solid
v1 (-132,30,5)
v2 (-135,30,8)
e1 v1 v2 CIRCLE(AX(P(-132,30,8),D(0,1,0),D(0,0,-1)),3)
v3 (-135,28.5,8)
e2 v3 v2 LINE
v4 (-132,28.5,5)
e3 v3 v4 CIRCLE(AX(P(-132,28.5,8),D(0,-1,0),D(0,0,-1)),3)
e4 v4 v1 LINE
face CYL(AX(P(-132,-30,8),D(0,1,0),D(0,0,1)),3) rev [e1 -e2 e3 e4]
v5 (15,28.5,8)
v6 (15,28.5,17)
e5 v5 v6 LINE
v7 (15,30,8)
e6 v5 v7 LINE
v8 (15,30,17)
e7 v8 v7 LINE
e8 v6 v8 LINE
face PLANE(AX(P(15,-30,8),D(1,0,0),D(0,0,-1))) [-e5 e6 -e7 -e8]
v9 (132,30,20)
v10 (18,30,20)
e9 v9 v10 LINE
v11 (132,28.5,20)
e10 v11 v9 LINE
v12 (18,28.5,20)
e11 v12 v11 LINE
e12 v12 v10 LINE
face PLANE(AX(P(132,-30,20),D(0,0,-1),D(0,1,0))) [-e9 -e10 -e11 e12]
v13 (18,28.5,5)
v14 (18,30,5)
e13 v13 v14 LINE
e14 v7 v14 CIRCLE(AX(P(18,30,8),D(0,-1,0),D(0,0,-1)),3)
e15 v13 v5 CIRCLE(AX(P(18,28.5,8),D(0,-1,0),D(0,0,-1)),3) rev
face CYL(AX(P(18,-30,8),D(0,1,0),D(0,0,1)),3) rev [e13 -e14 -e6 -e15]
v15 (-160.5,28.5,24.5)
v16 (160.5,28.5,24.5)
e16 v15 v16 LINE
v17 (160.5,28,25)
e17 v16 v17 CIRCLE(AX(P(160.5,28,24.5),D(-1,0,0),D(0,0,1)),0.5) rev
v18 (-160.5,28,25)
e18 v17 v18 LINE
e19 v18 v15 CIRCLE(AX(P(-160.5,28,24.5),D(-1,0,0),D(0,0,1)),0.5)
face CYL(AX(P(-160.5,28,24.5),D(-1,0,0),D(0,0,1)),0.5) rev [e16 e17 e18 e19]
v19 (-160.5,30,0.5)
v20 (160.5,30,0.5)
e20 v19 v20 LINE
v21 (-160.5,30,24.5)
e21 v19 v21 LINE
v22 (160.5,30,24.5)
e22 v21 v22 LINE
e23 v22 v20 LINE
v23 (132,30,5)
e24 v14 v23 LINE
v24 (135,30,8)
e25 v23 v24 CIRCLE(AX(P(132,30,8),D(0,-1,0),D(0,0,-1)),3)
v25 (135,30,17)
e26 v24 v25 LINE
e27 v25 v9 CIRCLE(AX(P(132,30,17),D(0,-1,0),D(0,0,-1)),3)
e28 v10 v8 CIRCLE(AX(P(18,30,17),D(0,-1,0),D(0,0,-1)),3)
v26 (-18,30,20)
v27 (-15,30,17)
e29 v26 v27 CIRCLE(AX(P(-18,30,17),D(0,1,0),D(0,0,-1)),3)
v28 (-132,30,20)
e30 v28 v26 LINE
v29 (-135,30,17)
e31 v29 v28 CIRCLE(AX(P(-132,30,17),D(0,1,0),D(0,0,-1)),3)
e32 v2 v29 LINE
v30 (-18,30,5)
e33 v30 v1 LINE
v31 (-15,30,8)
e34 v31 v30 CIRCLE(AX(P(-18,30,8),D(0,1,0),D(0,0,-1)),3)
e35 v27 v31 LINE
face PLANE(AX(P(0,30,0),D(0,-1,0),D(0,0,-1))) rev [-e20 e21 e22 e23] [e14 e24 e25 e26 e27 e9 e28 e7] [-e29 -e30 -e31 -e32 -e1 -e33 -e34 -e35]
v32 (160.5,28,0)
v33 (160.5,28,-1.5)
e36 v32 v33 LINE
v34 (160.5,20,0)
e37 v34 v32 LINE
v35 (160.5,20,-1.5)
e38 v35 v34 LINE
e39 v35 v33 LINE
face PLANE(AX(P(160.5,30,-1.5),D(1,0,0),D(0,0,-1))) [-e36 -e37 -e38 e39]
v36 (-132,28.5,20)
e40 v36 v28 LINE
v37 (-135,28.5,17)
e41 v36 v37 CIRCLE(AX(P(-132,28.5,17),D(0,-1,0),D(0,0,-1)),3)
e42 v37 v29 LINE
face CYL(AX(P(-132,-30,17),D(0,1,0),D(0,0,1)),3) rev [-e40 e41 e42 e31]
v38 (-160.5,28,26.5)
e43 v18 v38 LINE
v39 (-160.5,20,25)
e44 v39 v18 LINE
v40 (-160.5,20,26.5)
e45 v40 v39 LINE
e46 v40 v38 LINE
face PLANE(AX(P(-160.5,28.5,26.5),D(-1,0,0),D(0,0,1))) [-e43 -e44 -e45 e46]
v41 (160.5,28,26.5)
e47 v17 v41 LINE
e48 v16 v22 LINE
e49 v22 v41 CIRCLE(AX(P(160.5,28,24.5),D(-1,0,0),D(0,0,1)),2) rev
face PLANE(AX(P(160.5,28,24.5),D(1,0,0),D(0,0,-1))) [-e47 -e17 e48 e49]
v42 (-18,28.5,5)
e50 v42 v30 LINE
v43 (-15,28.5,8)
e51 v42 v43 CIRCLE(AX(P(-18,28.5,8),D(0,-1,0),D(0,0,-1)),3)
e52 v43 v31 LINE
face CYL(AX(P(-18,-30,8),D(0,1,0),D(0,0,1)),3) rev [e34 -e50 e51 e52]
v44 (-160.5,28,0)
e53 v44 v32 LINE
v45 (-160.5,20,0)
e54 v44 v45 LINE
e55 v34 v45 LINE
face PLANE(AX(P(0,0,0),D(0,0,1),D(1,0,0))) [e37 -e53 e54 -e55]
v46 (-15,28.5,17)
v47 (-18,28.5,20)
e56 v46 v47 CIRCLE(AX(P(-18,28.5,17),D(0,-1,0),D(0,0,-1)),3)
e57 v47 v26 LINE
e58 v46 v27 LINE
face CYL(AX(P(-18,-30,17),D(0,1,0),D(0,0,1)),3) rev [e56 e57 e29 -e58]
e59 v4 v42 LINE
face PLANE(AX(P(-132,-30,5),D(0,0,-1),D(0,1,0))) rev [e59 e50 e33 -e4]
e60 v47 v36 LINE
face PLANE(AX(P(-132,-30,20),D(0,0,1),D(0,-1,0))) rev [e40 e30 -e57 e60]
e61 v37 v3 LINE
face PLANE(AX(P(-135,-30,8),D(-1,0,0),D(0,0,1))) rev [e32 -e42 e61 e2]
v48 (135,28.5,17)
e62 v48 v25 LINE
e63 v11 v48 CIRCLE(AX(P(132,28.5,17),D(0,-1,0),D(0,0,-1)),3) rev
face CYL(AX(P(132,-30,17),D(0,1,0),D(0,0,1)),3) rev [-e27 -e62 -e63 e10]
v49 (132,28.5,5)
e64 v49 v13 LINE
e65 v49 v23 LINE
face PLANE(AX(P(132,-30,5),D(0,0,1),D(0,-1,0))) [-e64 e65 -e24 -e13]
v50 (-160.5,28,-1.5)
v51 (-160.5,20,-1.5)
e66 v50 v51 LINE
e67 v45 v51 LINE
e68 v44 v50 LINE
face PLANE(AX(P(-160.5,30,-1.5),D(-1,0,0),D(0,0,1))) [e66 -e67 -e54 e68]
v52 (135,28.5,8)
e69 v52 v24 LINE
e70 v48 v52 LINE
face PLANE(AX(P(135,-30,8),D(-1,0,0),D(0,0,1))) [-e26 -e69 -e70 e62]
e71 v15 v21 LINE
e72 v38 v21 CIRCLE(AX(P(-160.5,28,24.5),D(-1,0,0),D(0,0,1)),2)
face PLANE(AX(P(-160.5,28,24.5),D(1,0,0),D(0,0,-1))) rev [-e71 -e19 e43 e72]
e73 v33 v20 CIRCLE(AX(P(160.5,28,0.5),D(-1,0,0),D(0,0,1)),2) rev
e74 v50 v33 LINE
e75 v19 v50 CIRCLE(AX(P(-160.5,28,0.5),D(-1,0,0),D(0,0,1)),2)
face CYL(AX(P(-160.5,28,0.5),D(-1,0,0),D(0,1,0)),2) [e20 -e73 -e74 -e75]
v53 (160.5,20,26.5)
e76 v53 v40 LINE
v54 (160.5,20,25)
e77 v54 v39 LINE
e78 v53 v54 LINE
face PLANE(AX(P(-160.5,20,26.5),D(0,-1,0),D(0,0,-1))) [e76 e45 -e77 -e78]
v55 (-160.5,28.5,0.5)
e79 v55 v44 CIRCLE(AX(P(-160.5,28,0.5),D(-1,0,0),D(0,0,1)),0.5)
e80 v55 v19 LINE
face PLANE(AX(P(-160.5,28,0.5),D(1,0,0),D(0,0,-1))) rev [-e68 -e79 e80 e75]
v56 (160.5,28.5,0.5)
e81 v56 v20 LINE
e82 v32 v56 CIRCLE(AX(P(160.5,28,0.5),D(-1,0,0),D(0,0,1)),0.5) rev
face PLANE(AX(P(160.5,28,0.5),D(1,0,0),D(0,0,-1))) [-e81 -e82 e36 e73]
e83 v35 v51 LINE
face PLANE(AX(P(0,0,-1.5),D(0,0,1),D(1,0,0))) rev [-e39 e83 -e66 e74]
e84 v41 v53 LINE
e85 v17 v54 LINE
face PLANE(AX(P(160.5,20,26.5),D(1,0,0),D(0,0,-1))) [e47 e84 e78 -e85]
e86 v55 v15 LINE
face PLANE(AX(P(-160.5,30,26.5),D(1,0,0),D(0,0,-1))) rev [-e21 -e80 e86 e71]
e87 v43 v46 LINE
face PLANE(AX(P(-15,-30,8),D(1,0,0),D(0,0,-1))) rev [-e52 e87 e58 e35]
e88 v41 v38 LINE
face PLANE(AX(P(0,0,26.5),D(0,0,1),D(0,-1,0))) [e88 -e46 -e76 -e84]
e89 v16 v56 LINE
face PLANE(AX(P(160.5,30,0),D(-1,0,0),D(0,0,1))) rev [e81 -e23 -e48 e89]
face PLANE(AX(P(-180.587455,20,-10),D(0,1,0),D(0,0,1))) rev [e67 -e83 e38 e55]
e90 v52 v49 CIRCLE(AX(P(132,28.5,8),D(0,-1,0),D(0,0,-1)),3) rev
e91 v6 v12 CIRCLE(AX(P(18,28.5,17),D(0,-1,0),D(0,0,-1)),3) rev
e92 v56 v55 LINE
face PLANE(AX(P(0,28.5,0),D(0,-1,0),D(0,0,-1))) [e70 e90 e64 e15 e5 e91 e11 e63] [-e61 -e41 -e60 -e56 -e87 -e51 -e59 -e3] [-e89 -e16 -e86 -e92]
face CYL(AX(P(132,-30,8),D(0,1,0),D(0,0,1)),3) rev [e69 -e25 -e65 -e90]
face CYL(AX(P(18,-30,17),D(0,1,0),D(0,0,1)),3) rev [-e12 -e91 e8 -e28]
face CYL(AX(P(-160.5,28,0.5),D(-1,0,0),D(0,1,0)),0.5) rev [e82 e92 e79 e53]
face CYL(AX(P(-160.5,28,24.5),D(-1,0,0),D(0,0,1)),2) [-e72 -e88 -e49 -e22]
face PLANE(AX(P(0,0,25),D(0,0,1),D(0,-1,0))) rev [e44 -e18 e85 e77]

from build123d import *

# Parameters (mm, degrees)
SKETCH_1_W                         = 321
SKETCH_1_H                         = 60
SM_BASE_FLANGE_1_DEPTH             = 1.5
SM_EDGE_FLANGE_1_STRIP_W           = 7
SM_EDGE_FLANGE_1_STRIP_H           = 1.5
SM_EDGE_FLANGE_1_STRIP_CUT_DEPTH   = 321
SM_EDGE_FLANGE_1_STRIP_2_W         = 7
SM_EDGE_FLANGE_1_STRIP_2_H         = 1.5
SM_EDGE_FLANGE_1_STRIP_CUT_2_DEPTH = 321
SM_EDGE_FLANGE_1_DEPTH             = 321
SM_EDGE_FLANGE_1_BEND_DEPTH        = 321
SM_EDGE_FLANGE_2_STRIP_W           = 7
SM_EDGE_FLANGE_2_STRIP_H           = 1.5
SM_EDGE_FLANGE_2_STRIP_CUT_DEPTH   = 321
SM_EDGE_FLANGE_2_STRIP_2_W         = 7
SM_EDGE_FLANGE_2_STRIP_2_H         = 1.5
SM_EDGE_FLANGE_2_STRIP_CUT_2_DEPTH = 321
SM_EDGE_FLANGE_2_DEPTH             = 321
SM_EDGE_FLANGE_2_BEND_DEPTH        = 321
CUT_EXTRUDE_2_DEPTH                = 174.385408844
CUT_EXTRUDE_3_DEPTH                = 57
CUT_EXTRUDE_3_DEPTH_BACK           = 10
SKETCH_20_W                        = 341.087454661
SKETCH_20_H                        = 74.910603127


# Sheet-metal steps are written as plain solids
with BuildPart() as part:
    # Sketch 1 → 基体-法兰1 (new body)
    with BuildSketch(Plane.XY):
        Rectangle(SKETCH_1_W, SKETCH_1_H)
    extrude(amount=-SM_BASE_FLANGE_1_DEPTH)

    # 边线-法兰1 strip (across the edge) → 边线-法兰1 strip cut (cut)
    with BuildSketch(Plane(origin=(160.5, 30, 0), x_dir=(0, -1, 0), z_dir=(-1, 0, 0))):
        with Locations((-1.5, -0.75)):
            Rectangle(SM_EDGE_FLANGE_1_STRIP_W, SM_EDGE_FLANGE_1_STRIP_H)
    extrude(amount=SM_EDGE_FLANGE_1_STRIP_CUT_DEPTH, mode=Mode.SUBTRACT)

    # 边线-法兰1 strip 2 (across the edge) → 边线-法兰1 strip cut 2 (cut)
    with BuildSketch(Plane(origin=(-160.5, -30, 0), x_dir=(0, 1, 0), z_dir=(1, 0, 0))):
        with Locations((-1.5, -0.75)):
            Rectangle(SM_EDGE_FLANGE_1_STRIP_2_W, SM_EDGE_FLANGE_1_STRIP_2_H)
    extrude(amount=SM_EDGE_FLANGE_1_STRIP_CUT_2_DEPTH, mode=Mode.SUBTRACT)

    # 边线-法兰1 section (across the edge) → 边线-法兰1 (add)
    with BuildSketch(Plane(origin=(160.5, 30, 0), x_dir=(0, -1, 0), z_dir=(-1, 0, 0))):
        with BuildLine():
            Line((0, 0.5), (0, 26.5))
            Line((0, 26.5), (1.5, 26.5))
            Line((1.5, 26.5), (1.5, 0.5))
            ThreePointArc((1.5, 0.5), (1.646446609, 0.146446609), (2, 0))
            Line((2, 0), (2, -1.5))
            ThreePointArc((2, -1.5), (0.585786438, -0.914213562), (0, 0.5))
        make_face()
    extrude(amount=SM_EDGE_FLANGE_1_DEPTH)

    # 边线-法兰1 section 2 (across the edge) → 边线-法兰1 bend (add)
    with BuildSketch(Plane(origin=(-160.5, -30, 0), x_dir=(0, 1, 0), z_dir=(1, 0, 0))):
        with BuildLine():
            Line((0, 0.5), (0, 26.5))
            Line((0, 26.5), (1.5, 26.5))
            Line((1.5, 26.5), (1.5, 0.5))
            ThreePointArc((1.5, 0.5), (1.646446609, 0.146446609), (2, 0))
            Line((2, 0), (2, -1.5))
            ThreePointArc((2, -1.5), (0.585786438, -0.914213562), (0, 0.5))
        make_face()
    extrude(amount=SM_EDGE_FLANGE_1_BEND_DEPTH)

    # 边线-法兰2 strip (across the edge) → 边线-法兰2 strip cut (cut)
    with BuildSketch(Plane(origin=(160.5, 28.5, 26.5), x_dir=(0, 0, -1), z_dir=(-1, 0, 0))):
        with Locations((-1.5, -0.75)):
            Rectangle(SM_EDGE_FLANGE_2_STRIP_W, SM_EDGE_FLANGE_2_STRIP_H)
    extrude(amount=SM_EDGE_FLANGE_2_STRIP_CUT_DEPTH, mode=Mode.SUBTRACT)

    # 边线-法兰2 strip 2 (across the edge) → 边线-法兰2 strip cut 2 (cut)
    with BuildSketch(Plane(origin=(-160.5, -28.5, 26.5), x_dir=(0, 0, -1), z_dir=(1, 0, 0))):
        with Locations((-1.5, -0.75)):
            Rectangle(SM_EDGE_FLANGE_2_STRIP_2_W, SM_EDGE_FLANGE_2_STRIP_2_H)
    extrude(amount=SM_EDGE_FLANGE_2_STRIP_CUT_2_DEPTH, mode=Mode.SUBTRACT)

    # 边线-法兰2 section (across the edge) → 边线-法兰2 (add)
    with BuildSketch(Plane(origin=(160.5, 28.5, 26.5), x_dir=(0, 0, -1), z_dir=(-1, 0, 0))):
        with BuildLine():
            Line((0, 0.5), (0, 8.5))
            Line((0, 8.5), (1.5, 8.5))
            Line((1.5, 8.5), (1.5, 0.5))
            ThreePointArc((1.5, 0.5), (1.646446609, 0.146446609), (2, 0))
            Line((2, 0), (2, -1.5))
            ThreePointArc((2, -1.5), (0.585786438, -0.914213562), (0, 0.5))
        make_face()
    extrude(amount=SM_EDGE_FLANGE_2_DEPTH)

    # 边线-法兰2 section 2 (across the edge) → 边线-法兰2 bend (add)
    with BuildSketch(Plane(origin=(-160.5, -28.5, 26.5), x_dir=(0, 0, -1), z_dir=(1, 0, 0))):
        with BuildLine():
            Line((0, 0.5), (0, 8.5))
            Line((0, 8.5), (1.5, 8.5))
            Line((1.5, 8.5), (1.5, 0.5))
            ThreePointArc((1.5, 0.5), (1.646446609, 0.146446609), (2, 0))
            Line((2, 0), (2, -1.5))
            ThreePointArc((2, -1.5), (0.585786438, -0.914213562), (0, 0.5))
        make_face()
    extrude(amount=SM_EDGE_FLANGE_2_BEND_DEPTH)

    # 草图19 → 切除-拉伸2 (cut, through all)
    with BuildSketch(Plane(origin=(0, 30, 0), x_dir=(1, 0, 0), z_dir=(0, 1, 0))):
        with BuildLine():
            Line((-132, -5), (-18, -5))
            ThreePointArc((-18, -5), (-15.878679656, -5.878679656), (-15, -8))
            Line((-15, -8), (-15, -17))
            ThreePointArc((-15, -17), (-15.878679656, -19.121320344), (-18, -20))
            Line((-18, -20), (-132, -20))
            ThreePointArc((-132, -20), (-134.121320344, -19.121320344), (-135, -17))
            Line((-135, -17), (-135, -8))
            ThreePointArc((-135, -8), (-134.121320344, -5.878679656), (-132, -5))
        make_face()
    cut_extrude_2 = extrude(amount=-CUT_EXTRUDE_2_DEPTH, mode=Mode.SUBTRACT)

    # 镜向1: 切除-拉伸2 across plane
    add(cut_extrude_2.mirror(Plane(origin=(0, 0, 0), x_dir=(0, 0, 1), z_dir=(1, 0, 0))), mode=Mode.SUBTRACT)

    # 草图20 → 切除-拉伸3 (cut, two sides: drawn at the far end of the back side and taken through both)
    with BuildSketch(Plane.XY.offset(-CUT_EXTRUDE_3_DEPTH_BACK)):
        with Locations((-10.043727331, -17.455301564)):
            Rectangle(SKETCH_20_W, SKETCH_20_H)
    extrude(amount=CUT_EXTRUDE_3_DEPTH + CUT_EXTRUDE_3_DEPTH_BACK, mode=Mode.SUBTRACT)


solid = part.part
